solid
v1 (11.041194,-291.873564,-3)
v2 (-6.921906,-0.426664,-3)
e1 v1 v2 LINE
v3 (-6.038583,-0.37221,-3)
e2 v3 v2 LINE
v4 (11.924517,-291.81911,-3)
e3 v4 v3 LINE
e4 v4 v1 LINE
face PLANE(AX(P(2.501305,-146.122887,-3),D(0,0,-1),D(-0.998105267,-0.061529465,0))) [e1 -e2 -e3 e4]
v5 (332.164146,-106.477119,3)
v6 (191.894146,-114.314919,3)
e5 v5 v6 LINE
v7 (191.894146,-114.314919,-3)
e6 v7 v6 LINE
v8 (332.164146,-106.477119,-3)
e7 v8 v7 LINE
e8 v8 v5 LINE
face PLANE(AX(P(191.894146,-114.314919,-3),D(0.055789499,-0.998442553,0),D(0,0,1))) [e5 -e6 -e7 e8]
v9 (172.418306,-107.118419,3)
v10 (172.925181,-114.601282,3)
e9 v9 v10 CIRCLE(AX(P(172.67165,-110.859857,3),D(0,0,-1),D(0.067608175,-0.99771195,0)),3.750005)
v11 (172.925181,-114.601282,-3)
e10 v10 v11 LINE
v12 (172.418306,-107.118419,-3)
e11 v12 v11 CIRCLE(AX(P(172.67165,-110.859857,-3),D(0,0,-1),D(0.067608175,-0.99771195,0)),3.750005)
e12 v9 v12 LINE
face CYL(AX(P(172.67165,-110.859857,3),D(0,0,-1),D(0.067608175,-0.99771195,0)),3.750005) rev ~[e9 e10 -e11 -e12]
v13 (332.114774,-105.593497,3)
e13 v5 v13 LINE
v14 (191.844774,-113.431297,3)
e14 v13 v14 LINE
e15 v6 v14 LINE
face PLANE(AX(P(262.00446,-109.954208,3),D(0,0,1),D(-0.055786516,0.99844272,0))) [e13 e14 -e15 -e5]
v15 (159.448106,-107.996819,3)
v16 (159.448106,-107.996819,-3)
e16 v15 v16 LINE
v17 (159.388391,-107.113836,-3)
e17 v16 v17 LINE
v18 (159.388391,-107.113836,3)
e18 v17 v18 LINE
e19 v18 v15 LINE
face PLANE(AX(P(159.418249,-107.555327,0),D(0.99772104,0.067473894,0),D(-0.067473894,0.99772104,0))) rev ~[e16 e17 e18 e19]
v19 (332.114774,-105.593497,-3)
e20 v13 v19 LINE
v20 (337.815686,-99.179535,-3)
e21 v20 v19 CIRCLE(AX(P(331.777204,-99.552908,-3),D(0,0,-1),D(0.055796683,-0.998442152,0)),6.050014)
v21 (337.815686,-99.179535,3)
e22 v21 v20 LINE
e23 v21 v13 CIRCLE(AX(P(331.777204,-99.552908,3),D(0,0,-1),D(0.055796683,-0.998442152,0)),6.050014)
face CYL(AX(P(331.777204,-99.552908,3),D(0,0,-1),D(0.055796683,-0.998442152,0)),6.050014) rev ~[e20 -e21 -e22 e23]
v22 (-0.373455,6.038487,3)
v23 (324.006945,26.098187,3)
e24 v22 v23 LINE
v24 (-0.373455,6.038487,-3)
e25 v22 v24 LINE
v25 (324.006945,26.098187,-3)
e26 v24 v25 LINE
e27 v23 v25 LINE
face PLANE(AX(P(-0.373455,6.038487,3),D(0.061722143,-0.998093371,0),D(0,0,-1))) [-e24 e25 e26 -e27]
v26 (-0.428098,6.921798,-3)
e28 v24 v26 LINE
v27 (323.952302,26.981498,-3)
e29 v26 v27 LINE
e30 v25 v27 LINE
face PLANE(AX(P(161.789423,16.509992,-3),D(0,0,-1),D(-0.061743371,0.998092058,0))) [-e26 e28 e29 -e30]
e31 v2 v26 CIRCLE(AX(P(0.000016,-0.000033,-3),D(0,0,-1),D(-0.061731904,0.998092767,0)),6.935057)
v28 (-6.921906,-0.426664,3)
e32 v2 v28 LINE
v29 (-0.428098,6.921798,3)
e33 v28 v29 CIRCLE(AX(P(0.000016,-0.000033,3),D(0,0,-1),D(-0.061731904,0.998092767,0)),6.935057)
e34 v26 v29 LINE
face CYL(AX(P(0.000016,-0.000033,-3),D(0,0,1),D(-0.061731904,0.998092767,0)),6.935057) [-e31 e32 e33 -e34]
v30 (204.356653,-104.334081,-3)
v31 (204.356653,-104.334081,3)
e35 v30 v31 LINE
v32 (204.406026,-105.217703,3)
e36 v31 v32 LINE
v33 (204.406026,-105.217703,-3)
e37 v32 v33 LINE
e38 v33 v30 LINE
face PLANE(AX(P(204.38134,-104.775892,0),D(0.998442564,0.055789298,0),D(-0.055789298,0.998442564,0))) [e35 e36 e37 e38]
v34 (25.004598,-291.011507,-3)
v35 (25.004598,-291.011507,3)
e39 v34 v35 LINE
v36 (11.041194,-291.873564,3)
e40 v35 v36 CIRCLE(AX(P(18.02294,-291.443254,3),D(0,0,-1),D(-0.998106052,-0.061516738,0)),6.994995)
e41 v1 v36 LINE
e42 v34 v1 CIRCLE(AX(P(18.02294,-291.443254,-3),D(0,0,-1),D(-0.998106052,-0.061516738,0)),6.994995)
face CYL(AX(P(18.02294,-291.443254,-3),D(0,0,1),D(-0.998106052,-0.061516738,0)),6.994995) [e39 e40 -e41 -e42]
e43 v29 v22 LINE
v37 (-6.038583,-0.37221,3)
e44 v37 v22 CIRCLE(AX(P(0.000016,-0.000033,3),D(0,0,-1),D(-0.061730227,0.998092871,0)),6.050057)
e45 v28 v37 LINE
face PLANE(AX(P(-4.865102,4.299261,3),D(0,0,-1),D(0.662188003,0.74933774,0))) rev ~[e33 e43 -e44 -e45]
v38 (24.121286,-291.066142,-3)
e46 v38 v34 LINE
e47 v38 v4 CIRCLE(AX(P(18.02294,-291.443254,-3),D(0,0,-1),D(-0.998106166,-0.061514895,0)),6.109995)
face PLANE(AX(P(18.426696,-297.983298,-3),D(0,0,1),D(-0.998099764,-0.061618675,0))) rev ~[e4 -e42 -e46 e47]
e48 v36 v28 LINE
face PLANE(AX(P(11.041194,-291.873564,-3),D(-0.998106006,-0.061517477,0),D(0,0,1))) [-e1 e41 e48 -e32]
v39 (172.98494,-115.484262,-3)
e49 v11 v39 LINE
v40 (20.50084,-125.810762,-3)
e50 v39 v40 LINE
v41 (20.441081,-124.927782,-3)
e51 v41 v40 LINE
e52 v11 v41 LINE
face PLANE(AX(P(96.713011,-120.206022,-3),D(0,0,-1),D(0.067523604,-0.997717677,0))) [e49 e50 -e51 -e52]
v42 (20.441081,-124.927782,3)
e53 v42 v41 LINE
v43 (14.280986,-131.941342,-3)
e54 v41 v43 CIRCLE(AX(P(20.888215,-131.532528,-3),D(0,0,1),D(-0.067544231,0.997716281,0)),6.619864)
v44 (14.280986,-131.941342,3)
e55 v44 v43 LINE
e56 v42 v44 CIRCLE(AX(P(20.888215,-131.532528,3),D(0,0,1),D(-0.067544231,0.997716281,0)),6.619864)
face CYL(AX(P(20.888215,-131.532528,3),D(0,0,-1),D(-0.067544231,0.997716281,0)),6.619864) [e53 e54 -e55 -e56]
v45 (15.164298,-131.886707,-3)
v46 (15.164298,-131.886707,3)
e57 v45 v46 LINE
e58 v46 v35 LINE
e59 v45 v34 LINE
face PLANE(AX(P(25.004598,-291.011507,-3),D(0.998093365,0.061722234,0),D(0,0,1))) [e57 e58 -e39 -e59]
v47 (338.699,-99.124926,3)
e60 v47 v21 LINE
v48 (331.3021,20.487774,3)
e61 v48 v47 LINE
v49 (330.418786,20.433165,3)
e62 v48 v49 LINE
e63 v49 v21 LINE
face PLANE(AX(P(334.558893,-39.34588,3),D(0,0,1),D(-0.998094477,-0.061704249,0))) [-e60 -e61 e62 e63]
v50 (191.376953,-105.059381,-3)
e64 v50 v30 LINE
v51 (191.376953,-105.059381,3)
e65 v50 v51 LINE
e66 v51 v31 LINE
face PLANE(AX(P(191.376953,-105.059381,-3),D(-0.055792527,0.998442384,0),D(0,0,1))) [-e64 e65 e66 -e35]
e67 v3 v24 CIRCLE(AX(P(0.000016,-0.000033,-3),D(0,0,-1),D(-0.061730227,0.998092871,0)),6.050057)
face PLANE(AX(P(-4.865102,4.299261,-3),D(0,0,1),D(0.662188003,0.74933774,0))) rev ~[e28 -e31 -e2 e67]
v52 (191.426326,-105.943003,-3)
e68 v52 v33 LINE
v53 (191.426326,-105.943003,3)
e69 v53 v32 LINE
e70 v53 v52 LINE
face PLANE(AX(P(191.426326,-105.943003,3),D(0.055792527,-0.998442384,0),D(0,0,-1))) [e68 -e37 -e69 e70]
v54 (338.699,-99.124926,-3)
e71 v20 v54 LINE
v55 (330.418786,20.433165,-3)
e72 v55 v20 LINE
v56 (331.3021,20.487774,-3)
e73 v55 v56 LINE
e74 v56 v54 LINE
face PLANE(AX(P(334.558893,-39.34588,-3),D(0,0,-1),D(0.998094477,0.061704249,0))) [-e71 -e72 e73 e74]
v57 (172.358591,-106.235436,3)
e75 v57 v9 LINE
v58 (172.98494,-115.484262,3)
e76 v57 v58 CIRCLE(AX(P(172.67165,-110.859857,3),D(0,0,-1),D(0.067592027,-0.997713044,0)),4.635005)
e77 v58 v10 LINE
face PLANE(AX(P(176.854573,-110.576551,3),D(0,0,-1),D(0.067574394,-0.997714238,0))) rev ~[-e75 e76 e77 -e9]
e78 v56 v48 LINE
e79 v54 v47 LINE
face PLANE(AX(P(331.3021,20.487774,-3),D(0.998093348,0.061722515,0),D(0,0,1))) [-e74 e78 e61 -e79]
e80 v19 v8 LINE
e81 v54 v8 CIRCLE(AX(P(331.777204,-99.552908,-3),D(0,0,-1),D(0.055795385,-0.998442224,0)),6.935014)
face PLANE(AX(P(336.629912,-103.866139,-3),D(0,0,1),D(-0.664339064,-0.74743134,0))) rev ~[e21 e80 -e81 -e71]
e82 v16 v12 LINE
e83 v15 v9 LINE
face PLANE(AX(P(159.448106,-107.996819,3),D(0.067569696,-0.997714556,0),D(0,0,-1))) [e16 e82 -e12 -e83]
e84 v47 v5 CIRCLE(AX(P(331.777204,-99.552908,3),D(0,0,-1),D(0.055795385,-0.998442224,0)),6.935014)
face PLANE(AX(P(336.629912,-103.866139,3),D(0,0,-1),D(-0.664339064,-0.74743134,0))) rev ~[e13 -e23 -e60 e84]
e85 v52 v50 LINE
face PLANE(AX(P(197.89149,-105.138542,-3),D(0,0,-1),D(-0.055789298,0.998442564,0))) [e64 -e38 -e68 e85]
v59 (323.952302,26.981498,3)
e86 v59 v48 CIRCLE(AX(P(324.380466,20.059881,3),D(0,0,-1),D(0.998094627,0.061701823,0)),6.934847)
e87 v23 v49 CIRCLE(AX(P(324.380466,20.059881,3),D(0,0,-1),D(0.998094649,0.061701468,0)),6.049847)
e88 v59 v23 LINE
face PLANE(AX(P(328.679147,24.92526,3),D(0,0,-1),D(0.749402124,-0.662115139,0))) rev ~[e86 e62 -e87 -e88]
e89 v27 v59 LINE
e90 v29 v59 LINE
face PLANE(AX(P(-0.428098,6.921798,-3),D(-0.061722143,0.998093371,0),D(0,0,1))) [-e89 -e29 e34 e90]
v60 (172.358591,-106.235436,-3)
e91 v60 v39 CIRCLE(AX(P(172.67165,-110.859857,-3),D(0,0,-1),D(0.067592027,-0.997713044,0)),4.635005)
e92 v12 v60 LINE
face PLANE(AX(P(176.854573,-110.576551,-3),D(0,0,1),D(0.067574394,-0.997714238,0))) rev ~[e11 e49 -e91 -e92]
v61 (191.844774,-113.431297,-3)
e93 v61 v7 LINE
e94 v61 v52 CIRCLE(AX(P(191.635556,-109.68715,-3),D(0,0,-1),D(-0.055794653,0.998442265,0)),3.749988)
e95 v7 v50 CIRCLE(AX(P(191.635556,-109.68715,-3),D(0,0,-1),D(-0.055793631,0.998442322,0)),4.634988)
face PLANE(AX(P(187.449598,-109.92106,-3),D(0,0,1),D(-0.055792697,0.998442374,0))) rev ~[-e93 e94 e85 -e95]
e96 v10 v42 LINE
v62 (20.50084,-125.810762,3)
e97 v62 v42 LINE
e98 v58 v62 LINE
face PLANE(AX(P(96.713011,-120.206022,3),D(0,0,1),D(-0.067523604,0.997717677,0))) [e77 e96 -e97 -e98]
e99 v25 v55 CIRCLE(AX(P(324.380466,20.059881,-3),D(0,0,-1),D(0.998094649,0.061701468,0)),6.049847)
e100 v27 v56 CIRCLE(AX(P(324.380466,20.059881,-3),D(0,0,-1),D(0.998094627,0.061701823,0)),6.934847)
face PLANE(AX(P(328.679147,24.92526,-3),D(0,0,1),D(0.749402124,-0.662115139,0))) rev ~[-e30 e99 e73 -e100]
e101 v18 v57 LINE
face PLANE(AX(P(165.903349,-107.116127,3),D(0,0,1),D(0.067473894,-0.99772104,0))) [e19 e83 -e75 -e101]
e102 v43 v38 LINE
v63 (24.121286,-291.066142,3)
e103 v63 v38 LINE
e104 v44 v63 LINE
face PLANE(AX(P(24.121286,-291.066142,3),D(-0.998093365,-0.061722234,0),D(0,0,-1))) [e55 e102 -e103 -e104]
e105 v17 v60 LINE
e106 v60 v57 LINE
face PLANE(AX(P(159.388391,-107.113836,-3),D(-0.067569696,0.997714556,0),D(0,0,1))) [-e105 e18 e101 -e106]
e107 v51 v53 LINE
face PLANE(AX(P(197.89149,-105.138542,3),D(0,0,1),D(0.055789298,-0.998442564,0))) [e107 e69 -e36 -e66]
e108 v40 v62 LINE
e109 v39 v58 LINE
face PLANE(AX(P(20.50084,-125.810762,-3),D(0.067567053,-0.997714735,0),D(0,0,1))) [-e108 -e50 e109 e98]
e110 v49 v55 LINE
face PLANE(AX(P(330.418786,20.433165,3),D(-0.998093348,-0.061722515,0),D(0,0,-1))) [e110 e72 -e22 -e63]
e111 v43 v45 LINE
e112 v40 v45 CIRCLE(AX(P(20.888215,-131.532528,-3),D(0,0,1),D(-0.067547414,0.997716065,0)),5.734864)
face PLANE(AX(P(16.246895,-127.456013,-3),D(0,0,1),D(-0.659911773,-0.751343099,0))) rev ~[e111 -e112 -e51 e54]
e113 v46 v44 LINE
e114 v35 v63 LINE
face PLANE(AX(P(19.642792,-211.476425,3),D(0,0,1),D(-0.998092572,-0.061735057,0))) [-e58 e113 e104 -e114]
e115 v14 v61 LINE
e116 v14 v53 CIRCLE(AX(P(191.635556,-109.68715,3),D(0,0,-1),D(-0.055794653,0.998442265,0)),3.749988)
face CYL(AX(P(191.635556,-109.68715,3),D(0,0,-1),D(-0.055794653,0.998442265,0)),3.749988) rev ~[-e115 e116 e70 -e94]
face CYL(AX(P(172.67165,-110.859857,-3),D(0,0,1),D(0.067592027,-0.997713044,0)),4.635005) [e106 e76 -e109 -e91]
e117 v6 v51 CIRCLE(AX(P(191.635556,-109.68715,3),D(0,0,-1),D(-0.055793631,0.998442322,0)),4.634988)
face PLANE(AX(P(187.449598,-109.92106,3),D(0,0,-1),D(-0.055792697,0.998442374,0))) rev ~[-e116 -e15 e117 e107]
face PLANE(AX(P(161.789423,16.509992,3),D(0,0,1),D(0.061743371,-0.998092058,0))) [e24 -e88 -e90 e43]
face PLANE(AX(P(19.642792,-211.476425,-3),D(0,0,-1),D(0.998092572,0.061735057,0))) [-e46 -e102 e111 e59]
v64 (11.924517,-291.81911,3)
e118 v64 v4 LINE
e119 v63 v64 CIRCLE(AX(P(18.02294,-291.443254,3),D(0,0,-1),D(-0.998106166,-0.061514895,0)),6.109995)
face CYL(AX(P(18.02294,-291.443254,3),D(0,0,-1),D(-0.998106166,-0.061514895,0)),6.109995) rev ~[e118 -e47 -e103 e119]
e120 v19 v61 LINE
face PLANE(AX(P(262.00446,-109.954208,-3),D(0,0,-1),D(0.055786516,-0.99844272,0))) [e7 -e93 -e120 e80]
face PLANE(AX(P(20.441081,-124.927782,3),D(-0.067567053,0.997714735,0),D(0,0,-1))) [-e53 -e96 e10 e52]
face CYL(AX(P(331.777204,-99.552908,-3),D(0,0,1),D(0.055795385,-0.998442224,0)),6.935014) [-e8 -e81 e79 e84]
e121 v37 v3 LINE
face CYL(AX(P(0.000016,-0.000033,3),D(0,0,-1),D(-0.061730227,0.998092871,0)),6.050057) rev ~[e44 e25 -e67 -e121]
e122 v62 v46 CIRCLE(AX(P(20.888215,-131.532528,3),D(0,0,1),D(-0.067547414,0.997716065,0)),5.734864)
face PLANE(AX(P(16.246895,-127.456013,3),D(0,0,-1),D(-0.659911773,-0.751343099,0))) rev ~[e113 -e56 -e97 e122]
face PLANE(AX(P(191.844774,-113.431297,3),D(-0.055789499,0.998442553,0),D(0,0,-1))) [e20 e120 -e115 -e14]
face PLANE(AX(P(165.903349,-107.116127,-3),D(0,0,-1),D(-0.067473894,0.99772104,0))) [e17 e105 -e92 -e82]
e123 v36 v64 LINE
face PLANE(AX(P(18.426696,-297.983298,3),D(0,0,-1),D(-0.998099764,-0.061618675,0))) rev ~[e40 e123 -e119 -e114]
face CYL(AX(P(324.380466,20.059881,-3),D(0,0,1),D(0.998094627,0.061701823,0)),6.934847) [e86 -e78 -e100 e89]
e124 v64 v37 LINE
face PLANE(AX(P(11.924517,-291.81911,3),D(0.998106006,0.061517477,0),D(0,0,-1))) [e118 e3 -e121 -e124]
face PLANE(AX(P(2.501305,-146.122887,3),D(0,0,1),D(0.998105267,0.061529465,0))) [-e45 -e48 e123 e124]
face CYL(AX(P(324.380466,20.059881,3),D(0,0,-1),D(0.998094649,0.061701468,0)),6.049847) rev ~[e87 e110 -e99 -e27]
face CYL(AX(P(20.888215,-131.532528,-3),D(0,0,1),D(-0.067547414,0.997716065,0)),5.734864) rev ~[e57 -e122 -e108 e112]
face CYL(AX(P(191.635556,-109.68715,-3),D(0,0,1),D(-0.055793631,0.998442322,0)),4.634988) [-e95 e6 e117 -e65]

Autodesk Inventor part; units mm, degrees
ref_plane "YZ Plane" through (0, 0, 0) normal (1, 0, 0) x (0, 1, 0)
ref_plane "XZ Plane" through (0, 0, 0) normal (0, 1, 0) x (-1, 0, 0)
sketch "Sketch1" plane through (0, 0, 0) normal (0, 0, 1) x (1, 0, 0)
  circle A0 centre (0, 0) radius 6.05
surface extrude "ExtrusionSrf1" sketch "Sketch1" along normal mid plane 6 shown yes curves A0
sketch "Sketch2" plane through (0, 0, 0) normal (0, 0, 1) x (1, 0, 0)
  circle A0 centre (324.3803, 20.0598) radius 6.05
  point P0 (0, 0)
surface extrude "ExtrusionSrf2" sketch "Sketch2" along normal mid plane 6 shown yes curves A0
sketch "Sketch3" plane through (0, 0, 0) normal (0, 0, 1) x (1, 0, 0)
  circle A0 centre (18.0229, -291.4433) radius 6.11
  point P0 (0, 0)
surface extrude "ExtrusionSrf3" sketch "Sketch3" along normal blind 6 shown yes curves A0
sketch "Sketch4" plane through (0, 0, 0) normal (0, 0, 1) x (1, 0, 0)
  circle A0 centre (20.8883, -131.5327) radius 5.735
  point P0 (0, 0)
surface extrude "ExtrusionSrf4" sketch "Sketch4" along normal mid plane 6 shown yes curves A0
sketch "Sketch5" plane through (0, 0, 0) normal (0, 0, 1) x (1, 0, 0)
  circle A0 centre (331.7772, -99.5529) radius 6.05
  point P0 (0, 0)
surface extrude "ExtrusionSrf5" sketch "Sketch5" along normal mid plane 6 shown yes curves A0
sketch "Sketch6" plane through (0, 0, 0) normal (0, 0, 1) x (1, 0, 0)
  circle A0 centre (172.6717, -110.8599) radius 3
  point P0 (0, 0)
surface extrude "ExtrusionSrf6" sketch "Sketch6" along normal mid plane 6 shown yes curves A0
sketch "Sketch7" plane through (0, 0, 0) normal (0, 0, 1) x (1, 0, 0)
  circle A0 centre (191.6355, -109.6871) radius 3
  point P0 (0, 0)
surface extrude "ExtrusionSrf7" sketch "Sketch7" along normal mid plane 6 shown yes curves A0
sketch "Sketch8" plane through (0, 0, 0) normal (0, 0, 1) x (1, 0, 0)
  circle A0 centre (0, 0) radius 6.05 projected
  circle A1 centre (20.8883, -131.5327) radius 5.735 projected
  circle A2 centre (18.0229, -291.4433) radius 6.11 projected
  circle A3 centre (172.6717, -110.8599) radius 3 projected
  circle A4 centre (191.6355, -109.6871) radius 3 projected
  circle A5 centre (331.7772, -99.5529) radius 6.05 projected
  circle A6 centre (324.3803, 20.0598) radius 6.05 projected
  arc A7 (-0.3892, 6.293) -> (-6.2931, -0.3879) centre (0, 0) ccw
  arc A8 (11.67, -291.8348) -> (24.3758, -291.0504) centre (18.0229, -291.4433) ccw
  arc A9 (20.4583, -125.1822) -> (14.5355, -131.9256) centre (20.8883, -131.5327) ccw
  arc A10 (172.9424, -114.8557) -> (172.4011, -106.864) centre (172.6717, -110.8599) ccw
  arc A11 (330.6733, 20.4489) -> (323.9912, 26.3527) centre (324.3803, 20.0598) ccw
  arc A12 (191.4121, -105.6884) -> (191.859, -113.6859) centre (191.6355, -109.6871) ccw
  arc A13 (332.129, -105.8481) -> (338.0702, -99.1638) centre (331.7772, -99.5529) ccw
  line L0 (11.67, -291.8348) -> (-6.2931, -0.3879)
  line L1 (-0.3892, 6.293) -> (323.9912, 26.3527)
  line L2 (24.3758, -291.0504) -> (14.5355, -131.9256)
  line L3 (20.4583, -125.1822) -> (172.9424, -114.8557)
  line L4 (330.6733, 20.4489) -> (338.0702, -99.1638)
  line L5 (159.4309, -107.7424) -> (172.4011, -106.864)
  line L6 (191.859, -113.6859) -> (332.129, -105.8481)
  line L7 (191.4121, -105.6884) -> (204.3918, -104.9631)
  dimension "d14" = 0.255
  dimension "d15" = 0.255
  dimension "d16" = 0.255
  dimension "d17" = 0.63
  dimension "d19" = 0.255
  dimension "d22" = 1.005
  dimension "d23" = 1.005
  dimension "d34" = 13
  dimension "d35" = 13
ref_plane "Work Plane2" through (204.3918, -104.9631, 0) normal (0.9984426, 0.0557893, 0) x (-0.0557893, 0.9984426, 0)
sketch "Sketch10" plane through (204.3918, -104.9631, 0) normal (0.9984426, 0.0557893, 0) x (-0.0557893, 0.9984426, 0)
  line L0 (0.63, 3) -> (-0.255, 3)
  line L1 (-0.255, 3) -> (-0.255, -3)
  line L2 (-0.255, -3) -> (0.63, -3)
  line L3 (0.63, -3) -> (0.63, 3)
  line L4 (0.63, 0) -> (-0.255, 0) construction
  point P0 (116.2025, 0)
  point P1 (0, 0)
  dimension "d29" = 6
  dimension "d30" = 0.63
  dimension "d31" = 0.255
sweep "Sweep2" add profiles "Sketch10" path "Sketch8" path curves L7 A12 L6 A13 L4 A11 L1 A7 L0 A8 L2 A9 L3 A10 L5
equation "\"d14\" = inside"
equation "\"d15\" = inside"
equation "\"d16\" = inside"
equation "\"d17\" = backside"
equation "\"d19\" = inside"
equation "\"d30\" = backside"
equation "\"d31\" = inside"
equation "\"inside\" = 0.255"
equation "\"backside\" = 0.63"
properties part number "Belt 4" material "Rubber"
